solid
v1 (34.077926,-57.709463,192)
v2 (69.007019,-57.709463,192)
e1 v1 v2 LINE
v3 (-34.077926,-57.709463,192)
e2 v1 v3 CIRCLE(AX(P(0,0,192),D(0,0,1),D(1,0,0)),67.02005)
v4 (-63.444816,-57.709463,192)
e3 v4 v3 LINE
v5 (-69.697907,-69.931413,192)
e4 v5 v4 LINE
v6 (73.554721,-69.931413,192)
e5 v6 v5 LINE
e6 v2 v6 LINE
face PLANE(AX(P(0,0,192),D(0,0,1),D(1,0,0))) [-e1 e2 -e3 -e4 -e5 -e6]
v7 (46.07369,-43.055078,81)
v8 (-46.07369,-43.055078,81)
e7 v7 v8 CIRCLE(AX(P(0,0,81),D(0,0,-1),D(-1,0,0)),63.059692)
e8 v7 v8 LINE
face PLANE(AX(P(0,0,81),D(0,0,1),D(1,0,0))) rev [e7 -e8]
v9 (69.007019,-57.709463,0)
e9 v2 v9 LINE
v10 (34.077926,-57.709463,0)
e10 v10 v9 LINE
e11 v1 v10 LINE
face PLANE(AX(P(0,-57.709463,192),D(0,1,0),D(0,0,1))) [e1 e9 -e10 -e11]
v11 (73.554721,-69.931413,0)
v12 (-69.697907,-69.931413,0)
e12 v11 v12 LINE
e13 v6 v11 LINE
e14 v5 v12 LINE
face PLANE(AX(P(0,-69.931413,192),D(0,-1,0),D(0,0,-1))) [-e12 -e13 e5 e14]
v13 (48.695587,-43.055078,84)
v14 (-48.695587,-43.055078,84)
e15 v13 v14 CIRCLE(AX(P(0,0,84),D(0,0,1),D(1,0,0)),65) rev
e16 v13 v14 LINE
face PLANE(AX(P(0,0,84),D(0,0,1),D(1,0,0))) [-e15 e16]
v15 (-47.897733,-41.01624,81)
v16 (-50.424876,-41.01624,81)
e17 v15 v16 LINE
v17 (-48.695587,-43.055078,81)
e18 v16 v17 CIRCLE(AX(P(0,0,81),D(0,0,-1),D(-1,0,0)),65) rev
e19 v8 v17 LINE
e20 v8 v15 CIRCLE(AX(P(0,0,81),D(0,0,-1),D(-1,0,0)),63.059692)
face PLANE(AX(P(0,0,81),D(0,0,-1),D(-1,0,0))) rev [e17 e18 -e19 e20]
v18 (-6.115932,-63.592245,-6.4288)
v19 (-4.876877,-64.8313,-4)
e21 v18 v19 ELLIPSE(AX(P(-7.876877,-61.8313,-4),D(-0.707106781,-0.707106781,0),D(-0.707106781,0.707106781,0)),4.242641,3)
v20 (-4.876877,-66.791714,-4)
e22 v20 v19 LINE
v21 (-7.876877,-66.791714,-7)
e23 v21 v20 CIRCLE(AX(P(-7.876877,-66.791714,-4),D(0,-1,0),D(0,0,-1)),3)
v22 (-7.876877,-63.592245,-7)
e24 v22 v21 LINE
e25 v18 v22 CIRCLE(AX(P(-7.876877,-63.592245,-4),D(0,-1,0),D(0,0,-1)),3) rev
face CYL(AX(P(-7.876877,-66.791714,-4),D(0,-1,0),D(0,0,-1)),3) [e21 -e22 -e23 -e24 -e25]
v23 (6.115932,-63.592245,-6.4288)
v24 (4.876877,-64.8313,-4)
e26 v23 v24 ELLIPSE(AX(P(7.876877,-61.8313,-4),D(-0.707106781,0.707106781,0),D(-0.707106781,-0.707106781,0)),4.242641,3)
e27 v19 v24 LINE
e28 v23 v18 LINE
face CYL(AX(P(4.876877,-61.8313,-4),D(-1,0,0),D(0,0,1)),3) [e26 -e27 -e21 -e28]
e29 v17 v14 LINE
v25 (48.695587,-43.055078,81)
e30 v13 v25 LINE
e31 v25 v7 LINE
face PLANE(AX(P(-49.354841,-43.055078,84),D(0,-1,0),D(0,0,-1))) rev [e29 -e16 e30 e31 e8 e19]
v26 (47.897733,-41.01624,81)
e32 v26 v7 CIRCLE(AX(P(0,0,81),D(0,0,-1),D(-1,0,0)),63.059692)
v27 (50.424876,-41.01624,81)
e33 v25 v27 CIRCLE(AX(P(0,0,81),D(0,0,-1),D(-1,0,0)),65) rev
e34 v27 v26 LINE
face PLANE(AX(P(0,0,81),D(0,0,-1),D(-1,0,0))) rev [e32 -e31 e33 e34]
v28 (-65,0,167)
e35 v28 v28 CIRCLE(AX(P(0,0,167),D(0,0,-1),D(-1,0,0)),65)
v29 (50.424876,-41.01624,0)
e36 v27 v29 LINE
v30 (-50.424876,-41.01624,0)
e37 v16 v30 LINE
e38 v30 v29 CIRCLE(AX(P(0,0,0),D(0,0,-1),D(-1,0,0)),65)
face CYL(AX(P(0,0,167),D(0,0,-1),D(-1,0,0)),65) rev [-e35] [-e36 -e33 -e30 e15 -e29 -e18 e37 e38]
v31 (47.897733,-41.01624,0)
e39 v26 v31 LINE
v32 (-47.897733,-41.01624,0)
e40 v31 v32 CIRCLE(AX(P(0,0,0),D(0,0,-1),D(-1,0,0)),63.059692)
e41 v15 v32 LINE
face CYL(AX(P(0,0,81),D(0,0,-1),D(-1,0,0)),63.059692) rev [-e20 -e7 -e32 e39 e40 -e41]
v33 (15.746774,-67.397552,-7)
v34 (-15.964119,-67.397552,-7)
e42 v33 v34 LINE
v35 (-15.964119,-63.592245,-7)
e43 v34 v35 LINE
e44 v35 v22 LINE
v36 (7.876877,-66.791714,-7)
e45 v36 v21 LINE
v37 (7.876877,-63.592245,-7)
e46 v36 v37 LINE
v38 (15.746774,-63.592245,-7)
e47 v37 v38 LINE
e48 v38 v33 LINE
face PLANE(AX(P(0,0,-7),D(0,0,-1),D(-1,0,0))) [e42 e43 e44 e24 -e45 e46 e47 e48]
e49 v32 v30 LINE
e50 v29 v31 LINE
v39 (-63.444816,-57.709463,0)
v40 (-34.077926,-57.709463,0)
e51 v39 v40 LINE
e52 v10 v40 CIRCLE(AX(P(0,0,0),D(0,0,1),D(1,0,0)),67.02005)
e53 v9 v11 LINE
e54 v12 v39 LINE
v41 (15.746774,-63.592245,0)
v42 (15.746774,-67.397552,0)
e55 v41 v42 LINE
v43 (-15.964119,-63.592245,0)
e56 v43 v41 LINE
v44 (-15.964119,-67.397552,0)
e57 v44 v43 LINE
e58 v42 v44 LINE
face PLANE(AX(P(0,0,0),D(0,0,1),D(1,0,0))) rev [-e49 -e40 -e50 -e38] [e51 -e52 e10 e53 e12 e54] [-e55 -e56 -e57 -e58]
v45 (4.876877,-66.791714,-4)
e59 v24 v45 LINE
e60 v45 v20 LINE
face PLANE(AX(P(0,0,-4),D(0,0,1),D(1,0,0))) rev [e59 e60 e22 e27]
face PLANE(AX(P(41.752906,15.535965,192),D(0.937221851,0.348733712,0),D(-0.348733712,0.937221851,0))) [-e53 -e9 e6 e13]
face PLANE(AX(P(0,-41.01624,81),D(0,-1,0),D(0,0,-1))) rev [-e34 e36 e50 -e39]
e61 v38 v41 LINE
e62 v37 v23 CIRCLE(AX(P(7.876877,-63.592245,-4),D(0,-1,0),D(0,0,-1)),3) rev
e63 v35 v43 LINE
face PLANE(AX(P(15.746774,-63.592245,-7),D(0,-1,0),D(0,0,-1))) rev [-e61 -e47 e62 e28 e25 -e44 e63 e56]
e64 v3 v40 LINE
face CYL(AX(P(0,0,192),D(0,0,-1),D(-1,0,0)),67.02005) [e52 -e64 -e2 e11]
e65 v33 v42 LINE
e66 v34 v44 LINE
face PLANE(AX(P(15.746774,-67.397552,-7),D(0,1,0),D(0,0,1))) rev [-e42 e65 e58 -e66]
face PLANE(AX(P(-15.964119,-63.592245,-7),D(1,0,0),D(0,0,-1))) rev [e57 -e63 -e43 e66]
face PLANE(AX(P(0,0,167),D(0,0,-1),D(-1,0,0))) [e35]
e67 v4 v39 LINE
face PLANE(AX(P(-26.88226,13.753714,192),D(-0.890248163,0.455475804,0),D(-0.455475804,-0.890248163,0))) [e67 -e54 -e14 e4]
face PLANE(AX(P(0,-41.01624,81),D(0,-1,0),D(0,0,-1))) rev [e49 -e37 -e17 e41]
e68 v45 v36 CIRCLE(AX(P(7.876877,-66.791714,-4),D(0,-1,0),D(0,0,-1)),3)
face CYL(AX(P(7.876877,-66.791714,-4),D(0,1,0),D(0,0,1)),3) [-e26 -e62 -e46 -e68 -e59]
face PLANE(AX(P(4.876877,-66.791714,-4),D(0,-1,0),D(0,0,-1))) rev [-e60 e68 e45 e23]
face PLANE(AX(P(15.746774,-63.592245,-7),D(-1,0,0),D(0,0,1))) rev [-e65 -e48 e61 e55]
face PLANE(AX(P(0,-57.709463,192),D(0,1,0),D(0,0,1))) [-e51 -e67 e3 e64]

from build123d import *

# Parameters (mm, degrees)
EXTRUDE_2_DEPTH     = 192
SKETCH_5_R          = 60
CUT_EXTRUDE_2_DEPTH = 167
SKETCH_6_R          = 65
CUT_EXTRUDE_3_DEPTH = 167
EXTRUDE_3_DEPTH     = 81
SKETCH_8_W          = 31.710893006
SKETCH_8_H          = 3.805307161
EXTRUDE_4_DEPTH     = 7
SKETCH_9_W          = 9.753754566
SKETCH_9_H          = 1.960413463
CUT_EXTRUDE_4_DEPTH = 3
FILLET_1_R          = 3
EXTRUDE_5_DEPTH     = 3


with BuildPart() as part:
    # 草图4 → 凸台-拉伸2 (new body)
    with BuildSketch(Plane.XY):
        with BuildLine():
            Line((-63.444815749, -57.709462621), (-34.077926376, -57.709462621))
            ThreePointArc((-34.077926376, -57.709462621), (0, 67.020050299), (34.077926376, -57.709462621))
            Line((34.077926376, -57.709462621), (69.007018872, -57.709462621))
            Line((69.007018872, -57.709462621), (73.554721348, -69.931413026))
            Line((73.554721348, -69.931413026), (-69.697906654, -69.931413026))
            Line((-69.697906654, -69.931413026), (-63.444815749, -57.709462621))
        make_face()
    extrude(amount=EXTRUDE_2_DEPTH)

    # 草图5 → 切除-拉伸2 (cut)
    with BuildSketch(Plane(origin=(0, 0, 0), x_dir=(-1, 0, 0), z_dir=(0, 0, -1))):
        Circle(SKETCH_5_R)
    extrude(amount=-CUT_EXTRUDE_2_DEPTH, mode=Mode.SUBTRACT)

    # 草图6 → 切除-拉伸3 (cut)
    with BuildSketch(Plane(origin=(0, 0, 0), x_dir=(-1, 0, 0), z_dir=(0, 0, -1))):
        Circle(SKETCH_6_R)
    extrude(amount=-CUT_EXTRUDE_3_DEPTH, mode=Mode.SUBTRACT)

    # 草图7 → 凸台-拉伸3 (add)
    with BuildSketch(Plane(origin=(0, 0, 0), x_dir=(-1, 0, 0), z_dir=(0, 0, -1))):
        with BuildLine():
            Line((-47.897732915, -41.016239679), (-50.424875633, -41.016239679))
            ThreePointArc((-50.424875633, -41.016239679), (0, -65), (50.424875633, -41.016239679))
            Line((50.424875633, -41.016239679), (47.897732915, -41.016239679))
            ThreePointArc((47.897732915, -41.016239679), (0, -63.059691846), (-47.897732915, -41.016239679))
        make_face()
    extrude(amount=-EXTRUDE_3_DEPTH)

    # 草图8 → 凸台-拉伸4 (add)
    with BuildSketch(Plane(origin=(0, 0, 0), x_dir=(-1, 0, 0), z_dir=(0, 0, -1))):
        with Locations((0.108672156, -65.494898904)):
            Rectangle(SKETCH_8_W, SKETCH_8_H)
    extrude(amount=EXTRUDE_4_DEPTH)

    # 草图9 → 切除-拉伸4 (cut)
    with BuildSketch(Plane(origin=(0, 0, -7), x_dir=(-1, 0, 0), z_dir=(0, 0, -1))):
        with Locations((0, -65.811506795)):
            Rectangle(SKETCH_9_W, SKETCH_9_H)
    extrude(amount=-CUT_EXTRUDE_4_DEPTH, mode=Mode.SUBTRACT)

    # 圆角1
    # the kernel refuses this fillet: 3 mm, written as the material it takes off along each edge
    with BuildSketch(Plane(origin=(-4.876877283, -66.791713526, -7), x_dir=(-1, 0, 0), z_dir=(0, 1, 0)), Plane(origin=(4.876877283, -64.831300063, -7), x_dir=(1, 0, 0), z_dir=(0, -1, 0))) as fillet_1_piece_1:
        with BuildLine():
            CenterArc((FILLET_1_R, FILLET_1_R), FILLET_1_R, 180, 90)
            Line((0, FILLET_1_R), (-FILLET_1_R * 0.02, FILLET_1_R))
            Line((-FILLET_1_R * 0.02, FILLET_1_R), (-FILLET_1_R * 0.02, -FILLET_1_R * 0.02))
            Line((-FILLET_1_R * 0.02, -FILLET_1_R * 0.02), (FILLET_1_R, -FILLET_1_R * 0.02))
            Line((FILLET_1_R, -FILLET_1_R * 0.02), (FILLET_1_R, 0))
        make_face()
    extrude(amount=1.960413463, mode=Mode.SUBTRACT)
    with BuildSketch(Plane(origin=(-4.876877283, -64.831300063, -7), x_dir=(0, 1, 0), z_dir=(1, 0, 0))) as fillet_1_piece_2:
        with BuildLine():
            CenterArc((FILLET_1_R, FILLET_1_R), FILLET_1_R, 180, 90)
            Line((0, FILLET_1_R), (-FILLET_1_R * 0.02, FILLET_1_R))
            Line((-FILLET_1_R * 0.02, FILLET_1_R), (-FILLET_1_R * 0.02, -FILLET_1_R * 0.02))
            Line((-FILLET_1_R * 0.02, -FILLET_1_R * 0.02), (FILLET_1_R, -FILLET_1_R * 0.02))
            Line((FILLET_1_R, -FILLET_1_R * 0.02), (FILLET_1_R, 0))
        make_face()
    extrude(amount=9.753754565, mode=Mode.SUBTRACT)
    with BuildSketch(Plane(origin=(-12.376877283, -64.831300063, -7), x_dir=(0, 1, 0), z_dir=(1, 0, 0))) as fillet_1_piece_3a_section:
        with BuildLine():
            CenterArc((FILLET_1_R, FILLET_1_R), FILLET_1_R, 180, 90)
            Line((0, FILLET_1_R), (-FILLET_1_R * 0.02, FILLET_1_R))
            Line((-FILLET_1_R * 0.02, FILLET_1_R), (-FILLET_1_R * 0.02, -FILLET_1_R * 0.02))
            Line((-FILLET_1_R * 0.02, -FILLET_1_R * 0.02), (FILLET_1_R, -FILLET_1_R * 0.02))
            Line((FILLET_1_R, -FILLET_1_R * 0.02), (FILLET_1_R, 0))
        make_face()
    fillet_1_piece_3a = extrude(amount=17.253754565, mode=Mode.PRIVATE)
    fillet_1_piece_3a = split(fillet_1_piece_3a, bisect_by=Plane(origin=(-4.876877283, -64.15211472, -6.320814657), z_dir=(-1, 0, 0)), keep=Keep.TOP, mode=Mode.PRIVATE)
    with BuildSketch(Plane(origin=(-4.876877283, -66.791713526, -7), x_dir=(-1, 0, 0), z_dir=(0, 1, 0))) as fillet_1_piece_3b_section:
        with BuildLine():
            CenterArc((FILLET_1_R, FILLET_1_R), FILLET_1_R, 180, 90)
            Line((0, FILLET_1_R), (-FILLET_1_R * 0.02, FILLET_1_R))
            Line((-FILLET_1_R * 0.02, FILLET_1_R), (-FILLET_1_R * 0.02, -FILLET_1_R * 0.02))
            Line((-FILLET_1_R * 0.02, -FILLET_1_R * 0.02), (FILLET_1_R, -FILLET_1_R * 0.02))
            Line((FILLET_1_R, -FILLET_1_R * 0.02), (FILLET_1_R, 0))
        make_face()
    fillet_1_piece_3b = extrude(amount=9.460413463, mode=Mode.PRIVATE)
    fillet_1_piece_3b = split(fillet_1_piece_3b, bisect_by=Plane(origin=(-5.556062626, -64.831300063, -6.320814657), z_dir=(0, 1, 0)), keep=Keep.TOP, mode=Mode.PRIVATE)
    fillet_1_piece_3 = fillet_1_piece_3a & fillet_1_piece_3b
    add(fillet_1_piece_3, mode=Mode.SUBTRACT)
    with BuildSketch(Plane(origin=(4.876877283, -57.331300063, -7), x_dir=(1, 0, 0), z_dir=(0, -1, 0))) as fillet_1_piece_4a_section:
        with BuildLine():
            CenterArc((FILLET_1_R, FILLET_1_R), FILLET_1_R, 180, 90)
            Line((0, FILLET_1_R), (-FILLET_1_R * 0.02, FILLET_1_R))
            Line((-FILLET_1_R * 0.02, FILLET_1_R), (-FILLET_1_R * 0.02, -FILLET_1_R * 0.02))
            Line((-FILLET_1_R * 0.02, -FILLET_1_R * 0.02), (FILLET_1_R, -FILLET_1_R * 0.02))
            Line((FILLET_1_R, -FILLET_1_R * 0.02), (FILLET_1_R, 0))
        make_face()
    fillet_1_piece_4a = extrude(amount=9.460413463, mode=Mode.PRIVATE)
    fillet_1_piece_4a = split(fillet_1_piece_4a, bisect_by=Plane(origin=(5.556062626, -64.831300063, -6.320814657), z_dir=(0, 1, 0)), keep=Keep.TOP, mode=Mode.PRIVATE)
    with BuildSketch(Plane(origin=(-4.876877283, -64.831300063, -7), x_dir=(0, 1, 0), z_dir=(1, 0, 0))) as fillet_1_piece_4b_section:
        with BuildLine():
            CenterArc((FILLET_1_R, FILLET_1_R), FILLET_1_R, 180, 90)
            Line((0, FILLET_1_R), (-FILLET_1_R * 0.02, FILLET_1_R))
            Line((-FILLET_1_R * 0.02, FILLET_1_R), (-FILLET_1_R * 0.02, -FILLET_1_R * 0.02))
            Line((-FILLET_1_R * 0.02, -FILLET_1_R * 0.02), (FILLET_1_R, -FILLET_1_R * 0.02))
            Line((FILLET_1_R, -FILLET_1_R * 0.02), (FILLET_1_R, 0))
        make_face()
    fillet_1_piece_4b = extrude(amount=17.253754565, mode=Mode.PRIVATE)
    fillet_1_piece_4b = split(fillet_1_piece_4b, bisect_by=Plane(origin=(4.876877283, -64.15211472, -6.320814657), z_dir=(1, 0, 0)), keep=Keep.TOP, mode=Mode.PRIVATE)
    fillet_1_piece_4 = fillet_1_piece_4a & fillet_1_piece_4b
    add(fillet_1_piece_4, mode=Mode.SUBTRACT)

    # 草图10 → 凸台-拉伸5 (add)
    with BuildSketch(Plane.XY.offset(81)):
        with BuildLine():
            Line((-49.354840822, -43.055078484), (49.354840822, -43.055078484))
            ThreePointArc((49.354840822, -43.055078484), (0, -65.495344078), (-49.354840822, -43.055078484))
        make_face()
    extrude(amount=EXTRUDE_5_DEPTH)


solid = part.part
